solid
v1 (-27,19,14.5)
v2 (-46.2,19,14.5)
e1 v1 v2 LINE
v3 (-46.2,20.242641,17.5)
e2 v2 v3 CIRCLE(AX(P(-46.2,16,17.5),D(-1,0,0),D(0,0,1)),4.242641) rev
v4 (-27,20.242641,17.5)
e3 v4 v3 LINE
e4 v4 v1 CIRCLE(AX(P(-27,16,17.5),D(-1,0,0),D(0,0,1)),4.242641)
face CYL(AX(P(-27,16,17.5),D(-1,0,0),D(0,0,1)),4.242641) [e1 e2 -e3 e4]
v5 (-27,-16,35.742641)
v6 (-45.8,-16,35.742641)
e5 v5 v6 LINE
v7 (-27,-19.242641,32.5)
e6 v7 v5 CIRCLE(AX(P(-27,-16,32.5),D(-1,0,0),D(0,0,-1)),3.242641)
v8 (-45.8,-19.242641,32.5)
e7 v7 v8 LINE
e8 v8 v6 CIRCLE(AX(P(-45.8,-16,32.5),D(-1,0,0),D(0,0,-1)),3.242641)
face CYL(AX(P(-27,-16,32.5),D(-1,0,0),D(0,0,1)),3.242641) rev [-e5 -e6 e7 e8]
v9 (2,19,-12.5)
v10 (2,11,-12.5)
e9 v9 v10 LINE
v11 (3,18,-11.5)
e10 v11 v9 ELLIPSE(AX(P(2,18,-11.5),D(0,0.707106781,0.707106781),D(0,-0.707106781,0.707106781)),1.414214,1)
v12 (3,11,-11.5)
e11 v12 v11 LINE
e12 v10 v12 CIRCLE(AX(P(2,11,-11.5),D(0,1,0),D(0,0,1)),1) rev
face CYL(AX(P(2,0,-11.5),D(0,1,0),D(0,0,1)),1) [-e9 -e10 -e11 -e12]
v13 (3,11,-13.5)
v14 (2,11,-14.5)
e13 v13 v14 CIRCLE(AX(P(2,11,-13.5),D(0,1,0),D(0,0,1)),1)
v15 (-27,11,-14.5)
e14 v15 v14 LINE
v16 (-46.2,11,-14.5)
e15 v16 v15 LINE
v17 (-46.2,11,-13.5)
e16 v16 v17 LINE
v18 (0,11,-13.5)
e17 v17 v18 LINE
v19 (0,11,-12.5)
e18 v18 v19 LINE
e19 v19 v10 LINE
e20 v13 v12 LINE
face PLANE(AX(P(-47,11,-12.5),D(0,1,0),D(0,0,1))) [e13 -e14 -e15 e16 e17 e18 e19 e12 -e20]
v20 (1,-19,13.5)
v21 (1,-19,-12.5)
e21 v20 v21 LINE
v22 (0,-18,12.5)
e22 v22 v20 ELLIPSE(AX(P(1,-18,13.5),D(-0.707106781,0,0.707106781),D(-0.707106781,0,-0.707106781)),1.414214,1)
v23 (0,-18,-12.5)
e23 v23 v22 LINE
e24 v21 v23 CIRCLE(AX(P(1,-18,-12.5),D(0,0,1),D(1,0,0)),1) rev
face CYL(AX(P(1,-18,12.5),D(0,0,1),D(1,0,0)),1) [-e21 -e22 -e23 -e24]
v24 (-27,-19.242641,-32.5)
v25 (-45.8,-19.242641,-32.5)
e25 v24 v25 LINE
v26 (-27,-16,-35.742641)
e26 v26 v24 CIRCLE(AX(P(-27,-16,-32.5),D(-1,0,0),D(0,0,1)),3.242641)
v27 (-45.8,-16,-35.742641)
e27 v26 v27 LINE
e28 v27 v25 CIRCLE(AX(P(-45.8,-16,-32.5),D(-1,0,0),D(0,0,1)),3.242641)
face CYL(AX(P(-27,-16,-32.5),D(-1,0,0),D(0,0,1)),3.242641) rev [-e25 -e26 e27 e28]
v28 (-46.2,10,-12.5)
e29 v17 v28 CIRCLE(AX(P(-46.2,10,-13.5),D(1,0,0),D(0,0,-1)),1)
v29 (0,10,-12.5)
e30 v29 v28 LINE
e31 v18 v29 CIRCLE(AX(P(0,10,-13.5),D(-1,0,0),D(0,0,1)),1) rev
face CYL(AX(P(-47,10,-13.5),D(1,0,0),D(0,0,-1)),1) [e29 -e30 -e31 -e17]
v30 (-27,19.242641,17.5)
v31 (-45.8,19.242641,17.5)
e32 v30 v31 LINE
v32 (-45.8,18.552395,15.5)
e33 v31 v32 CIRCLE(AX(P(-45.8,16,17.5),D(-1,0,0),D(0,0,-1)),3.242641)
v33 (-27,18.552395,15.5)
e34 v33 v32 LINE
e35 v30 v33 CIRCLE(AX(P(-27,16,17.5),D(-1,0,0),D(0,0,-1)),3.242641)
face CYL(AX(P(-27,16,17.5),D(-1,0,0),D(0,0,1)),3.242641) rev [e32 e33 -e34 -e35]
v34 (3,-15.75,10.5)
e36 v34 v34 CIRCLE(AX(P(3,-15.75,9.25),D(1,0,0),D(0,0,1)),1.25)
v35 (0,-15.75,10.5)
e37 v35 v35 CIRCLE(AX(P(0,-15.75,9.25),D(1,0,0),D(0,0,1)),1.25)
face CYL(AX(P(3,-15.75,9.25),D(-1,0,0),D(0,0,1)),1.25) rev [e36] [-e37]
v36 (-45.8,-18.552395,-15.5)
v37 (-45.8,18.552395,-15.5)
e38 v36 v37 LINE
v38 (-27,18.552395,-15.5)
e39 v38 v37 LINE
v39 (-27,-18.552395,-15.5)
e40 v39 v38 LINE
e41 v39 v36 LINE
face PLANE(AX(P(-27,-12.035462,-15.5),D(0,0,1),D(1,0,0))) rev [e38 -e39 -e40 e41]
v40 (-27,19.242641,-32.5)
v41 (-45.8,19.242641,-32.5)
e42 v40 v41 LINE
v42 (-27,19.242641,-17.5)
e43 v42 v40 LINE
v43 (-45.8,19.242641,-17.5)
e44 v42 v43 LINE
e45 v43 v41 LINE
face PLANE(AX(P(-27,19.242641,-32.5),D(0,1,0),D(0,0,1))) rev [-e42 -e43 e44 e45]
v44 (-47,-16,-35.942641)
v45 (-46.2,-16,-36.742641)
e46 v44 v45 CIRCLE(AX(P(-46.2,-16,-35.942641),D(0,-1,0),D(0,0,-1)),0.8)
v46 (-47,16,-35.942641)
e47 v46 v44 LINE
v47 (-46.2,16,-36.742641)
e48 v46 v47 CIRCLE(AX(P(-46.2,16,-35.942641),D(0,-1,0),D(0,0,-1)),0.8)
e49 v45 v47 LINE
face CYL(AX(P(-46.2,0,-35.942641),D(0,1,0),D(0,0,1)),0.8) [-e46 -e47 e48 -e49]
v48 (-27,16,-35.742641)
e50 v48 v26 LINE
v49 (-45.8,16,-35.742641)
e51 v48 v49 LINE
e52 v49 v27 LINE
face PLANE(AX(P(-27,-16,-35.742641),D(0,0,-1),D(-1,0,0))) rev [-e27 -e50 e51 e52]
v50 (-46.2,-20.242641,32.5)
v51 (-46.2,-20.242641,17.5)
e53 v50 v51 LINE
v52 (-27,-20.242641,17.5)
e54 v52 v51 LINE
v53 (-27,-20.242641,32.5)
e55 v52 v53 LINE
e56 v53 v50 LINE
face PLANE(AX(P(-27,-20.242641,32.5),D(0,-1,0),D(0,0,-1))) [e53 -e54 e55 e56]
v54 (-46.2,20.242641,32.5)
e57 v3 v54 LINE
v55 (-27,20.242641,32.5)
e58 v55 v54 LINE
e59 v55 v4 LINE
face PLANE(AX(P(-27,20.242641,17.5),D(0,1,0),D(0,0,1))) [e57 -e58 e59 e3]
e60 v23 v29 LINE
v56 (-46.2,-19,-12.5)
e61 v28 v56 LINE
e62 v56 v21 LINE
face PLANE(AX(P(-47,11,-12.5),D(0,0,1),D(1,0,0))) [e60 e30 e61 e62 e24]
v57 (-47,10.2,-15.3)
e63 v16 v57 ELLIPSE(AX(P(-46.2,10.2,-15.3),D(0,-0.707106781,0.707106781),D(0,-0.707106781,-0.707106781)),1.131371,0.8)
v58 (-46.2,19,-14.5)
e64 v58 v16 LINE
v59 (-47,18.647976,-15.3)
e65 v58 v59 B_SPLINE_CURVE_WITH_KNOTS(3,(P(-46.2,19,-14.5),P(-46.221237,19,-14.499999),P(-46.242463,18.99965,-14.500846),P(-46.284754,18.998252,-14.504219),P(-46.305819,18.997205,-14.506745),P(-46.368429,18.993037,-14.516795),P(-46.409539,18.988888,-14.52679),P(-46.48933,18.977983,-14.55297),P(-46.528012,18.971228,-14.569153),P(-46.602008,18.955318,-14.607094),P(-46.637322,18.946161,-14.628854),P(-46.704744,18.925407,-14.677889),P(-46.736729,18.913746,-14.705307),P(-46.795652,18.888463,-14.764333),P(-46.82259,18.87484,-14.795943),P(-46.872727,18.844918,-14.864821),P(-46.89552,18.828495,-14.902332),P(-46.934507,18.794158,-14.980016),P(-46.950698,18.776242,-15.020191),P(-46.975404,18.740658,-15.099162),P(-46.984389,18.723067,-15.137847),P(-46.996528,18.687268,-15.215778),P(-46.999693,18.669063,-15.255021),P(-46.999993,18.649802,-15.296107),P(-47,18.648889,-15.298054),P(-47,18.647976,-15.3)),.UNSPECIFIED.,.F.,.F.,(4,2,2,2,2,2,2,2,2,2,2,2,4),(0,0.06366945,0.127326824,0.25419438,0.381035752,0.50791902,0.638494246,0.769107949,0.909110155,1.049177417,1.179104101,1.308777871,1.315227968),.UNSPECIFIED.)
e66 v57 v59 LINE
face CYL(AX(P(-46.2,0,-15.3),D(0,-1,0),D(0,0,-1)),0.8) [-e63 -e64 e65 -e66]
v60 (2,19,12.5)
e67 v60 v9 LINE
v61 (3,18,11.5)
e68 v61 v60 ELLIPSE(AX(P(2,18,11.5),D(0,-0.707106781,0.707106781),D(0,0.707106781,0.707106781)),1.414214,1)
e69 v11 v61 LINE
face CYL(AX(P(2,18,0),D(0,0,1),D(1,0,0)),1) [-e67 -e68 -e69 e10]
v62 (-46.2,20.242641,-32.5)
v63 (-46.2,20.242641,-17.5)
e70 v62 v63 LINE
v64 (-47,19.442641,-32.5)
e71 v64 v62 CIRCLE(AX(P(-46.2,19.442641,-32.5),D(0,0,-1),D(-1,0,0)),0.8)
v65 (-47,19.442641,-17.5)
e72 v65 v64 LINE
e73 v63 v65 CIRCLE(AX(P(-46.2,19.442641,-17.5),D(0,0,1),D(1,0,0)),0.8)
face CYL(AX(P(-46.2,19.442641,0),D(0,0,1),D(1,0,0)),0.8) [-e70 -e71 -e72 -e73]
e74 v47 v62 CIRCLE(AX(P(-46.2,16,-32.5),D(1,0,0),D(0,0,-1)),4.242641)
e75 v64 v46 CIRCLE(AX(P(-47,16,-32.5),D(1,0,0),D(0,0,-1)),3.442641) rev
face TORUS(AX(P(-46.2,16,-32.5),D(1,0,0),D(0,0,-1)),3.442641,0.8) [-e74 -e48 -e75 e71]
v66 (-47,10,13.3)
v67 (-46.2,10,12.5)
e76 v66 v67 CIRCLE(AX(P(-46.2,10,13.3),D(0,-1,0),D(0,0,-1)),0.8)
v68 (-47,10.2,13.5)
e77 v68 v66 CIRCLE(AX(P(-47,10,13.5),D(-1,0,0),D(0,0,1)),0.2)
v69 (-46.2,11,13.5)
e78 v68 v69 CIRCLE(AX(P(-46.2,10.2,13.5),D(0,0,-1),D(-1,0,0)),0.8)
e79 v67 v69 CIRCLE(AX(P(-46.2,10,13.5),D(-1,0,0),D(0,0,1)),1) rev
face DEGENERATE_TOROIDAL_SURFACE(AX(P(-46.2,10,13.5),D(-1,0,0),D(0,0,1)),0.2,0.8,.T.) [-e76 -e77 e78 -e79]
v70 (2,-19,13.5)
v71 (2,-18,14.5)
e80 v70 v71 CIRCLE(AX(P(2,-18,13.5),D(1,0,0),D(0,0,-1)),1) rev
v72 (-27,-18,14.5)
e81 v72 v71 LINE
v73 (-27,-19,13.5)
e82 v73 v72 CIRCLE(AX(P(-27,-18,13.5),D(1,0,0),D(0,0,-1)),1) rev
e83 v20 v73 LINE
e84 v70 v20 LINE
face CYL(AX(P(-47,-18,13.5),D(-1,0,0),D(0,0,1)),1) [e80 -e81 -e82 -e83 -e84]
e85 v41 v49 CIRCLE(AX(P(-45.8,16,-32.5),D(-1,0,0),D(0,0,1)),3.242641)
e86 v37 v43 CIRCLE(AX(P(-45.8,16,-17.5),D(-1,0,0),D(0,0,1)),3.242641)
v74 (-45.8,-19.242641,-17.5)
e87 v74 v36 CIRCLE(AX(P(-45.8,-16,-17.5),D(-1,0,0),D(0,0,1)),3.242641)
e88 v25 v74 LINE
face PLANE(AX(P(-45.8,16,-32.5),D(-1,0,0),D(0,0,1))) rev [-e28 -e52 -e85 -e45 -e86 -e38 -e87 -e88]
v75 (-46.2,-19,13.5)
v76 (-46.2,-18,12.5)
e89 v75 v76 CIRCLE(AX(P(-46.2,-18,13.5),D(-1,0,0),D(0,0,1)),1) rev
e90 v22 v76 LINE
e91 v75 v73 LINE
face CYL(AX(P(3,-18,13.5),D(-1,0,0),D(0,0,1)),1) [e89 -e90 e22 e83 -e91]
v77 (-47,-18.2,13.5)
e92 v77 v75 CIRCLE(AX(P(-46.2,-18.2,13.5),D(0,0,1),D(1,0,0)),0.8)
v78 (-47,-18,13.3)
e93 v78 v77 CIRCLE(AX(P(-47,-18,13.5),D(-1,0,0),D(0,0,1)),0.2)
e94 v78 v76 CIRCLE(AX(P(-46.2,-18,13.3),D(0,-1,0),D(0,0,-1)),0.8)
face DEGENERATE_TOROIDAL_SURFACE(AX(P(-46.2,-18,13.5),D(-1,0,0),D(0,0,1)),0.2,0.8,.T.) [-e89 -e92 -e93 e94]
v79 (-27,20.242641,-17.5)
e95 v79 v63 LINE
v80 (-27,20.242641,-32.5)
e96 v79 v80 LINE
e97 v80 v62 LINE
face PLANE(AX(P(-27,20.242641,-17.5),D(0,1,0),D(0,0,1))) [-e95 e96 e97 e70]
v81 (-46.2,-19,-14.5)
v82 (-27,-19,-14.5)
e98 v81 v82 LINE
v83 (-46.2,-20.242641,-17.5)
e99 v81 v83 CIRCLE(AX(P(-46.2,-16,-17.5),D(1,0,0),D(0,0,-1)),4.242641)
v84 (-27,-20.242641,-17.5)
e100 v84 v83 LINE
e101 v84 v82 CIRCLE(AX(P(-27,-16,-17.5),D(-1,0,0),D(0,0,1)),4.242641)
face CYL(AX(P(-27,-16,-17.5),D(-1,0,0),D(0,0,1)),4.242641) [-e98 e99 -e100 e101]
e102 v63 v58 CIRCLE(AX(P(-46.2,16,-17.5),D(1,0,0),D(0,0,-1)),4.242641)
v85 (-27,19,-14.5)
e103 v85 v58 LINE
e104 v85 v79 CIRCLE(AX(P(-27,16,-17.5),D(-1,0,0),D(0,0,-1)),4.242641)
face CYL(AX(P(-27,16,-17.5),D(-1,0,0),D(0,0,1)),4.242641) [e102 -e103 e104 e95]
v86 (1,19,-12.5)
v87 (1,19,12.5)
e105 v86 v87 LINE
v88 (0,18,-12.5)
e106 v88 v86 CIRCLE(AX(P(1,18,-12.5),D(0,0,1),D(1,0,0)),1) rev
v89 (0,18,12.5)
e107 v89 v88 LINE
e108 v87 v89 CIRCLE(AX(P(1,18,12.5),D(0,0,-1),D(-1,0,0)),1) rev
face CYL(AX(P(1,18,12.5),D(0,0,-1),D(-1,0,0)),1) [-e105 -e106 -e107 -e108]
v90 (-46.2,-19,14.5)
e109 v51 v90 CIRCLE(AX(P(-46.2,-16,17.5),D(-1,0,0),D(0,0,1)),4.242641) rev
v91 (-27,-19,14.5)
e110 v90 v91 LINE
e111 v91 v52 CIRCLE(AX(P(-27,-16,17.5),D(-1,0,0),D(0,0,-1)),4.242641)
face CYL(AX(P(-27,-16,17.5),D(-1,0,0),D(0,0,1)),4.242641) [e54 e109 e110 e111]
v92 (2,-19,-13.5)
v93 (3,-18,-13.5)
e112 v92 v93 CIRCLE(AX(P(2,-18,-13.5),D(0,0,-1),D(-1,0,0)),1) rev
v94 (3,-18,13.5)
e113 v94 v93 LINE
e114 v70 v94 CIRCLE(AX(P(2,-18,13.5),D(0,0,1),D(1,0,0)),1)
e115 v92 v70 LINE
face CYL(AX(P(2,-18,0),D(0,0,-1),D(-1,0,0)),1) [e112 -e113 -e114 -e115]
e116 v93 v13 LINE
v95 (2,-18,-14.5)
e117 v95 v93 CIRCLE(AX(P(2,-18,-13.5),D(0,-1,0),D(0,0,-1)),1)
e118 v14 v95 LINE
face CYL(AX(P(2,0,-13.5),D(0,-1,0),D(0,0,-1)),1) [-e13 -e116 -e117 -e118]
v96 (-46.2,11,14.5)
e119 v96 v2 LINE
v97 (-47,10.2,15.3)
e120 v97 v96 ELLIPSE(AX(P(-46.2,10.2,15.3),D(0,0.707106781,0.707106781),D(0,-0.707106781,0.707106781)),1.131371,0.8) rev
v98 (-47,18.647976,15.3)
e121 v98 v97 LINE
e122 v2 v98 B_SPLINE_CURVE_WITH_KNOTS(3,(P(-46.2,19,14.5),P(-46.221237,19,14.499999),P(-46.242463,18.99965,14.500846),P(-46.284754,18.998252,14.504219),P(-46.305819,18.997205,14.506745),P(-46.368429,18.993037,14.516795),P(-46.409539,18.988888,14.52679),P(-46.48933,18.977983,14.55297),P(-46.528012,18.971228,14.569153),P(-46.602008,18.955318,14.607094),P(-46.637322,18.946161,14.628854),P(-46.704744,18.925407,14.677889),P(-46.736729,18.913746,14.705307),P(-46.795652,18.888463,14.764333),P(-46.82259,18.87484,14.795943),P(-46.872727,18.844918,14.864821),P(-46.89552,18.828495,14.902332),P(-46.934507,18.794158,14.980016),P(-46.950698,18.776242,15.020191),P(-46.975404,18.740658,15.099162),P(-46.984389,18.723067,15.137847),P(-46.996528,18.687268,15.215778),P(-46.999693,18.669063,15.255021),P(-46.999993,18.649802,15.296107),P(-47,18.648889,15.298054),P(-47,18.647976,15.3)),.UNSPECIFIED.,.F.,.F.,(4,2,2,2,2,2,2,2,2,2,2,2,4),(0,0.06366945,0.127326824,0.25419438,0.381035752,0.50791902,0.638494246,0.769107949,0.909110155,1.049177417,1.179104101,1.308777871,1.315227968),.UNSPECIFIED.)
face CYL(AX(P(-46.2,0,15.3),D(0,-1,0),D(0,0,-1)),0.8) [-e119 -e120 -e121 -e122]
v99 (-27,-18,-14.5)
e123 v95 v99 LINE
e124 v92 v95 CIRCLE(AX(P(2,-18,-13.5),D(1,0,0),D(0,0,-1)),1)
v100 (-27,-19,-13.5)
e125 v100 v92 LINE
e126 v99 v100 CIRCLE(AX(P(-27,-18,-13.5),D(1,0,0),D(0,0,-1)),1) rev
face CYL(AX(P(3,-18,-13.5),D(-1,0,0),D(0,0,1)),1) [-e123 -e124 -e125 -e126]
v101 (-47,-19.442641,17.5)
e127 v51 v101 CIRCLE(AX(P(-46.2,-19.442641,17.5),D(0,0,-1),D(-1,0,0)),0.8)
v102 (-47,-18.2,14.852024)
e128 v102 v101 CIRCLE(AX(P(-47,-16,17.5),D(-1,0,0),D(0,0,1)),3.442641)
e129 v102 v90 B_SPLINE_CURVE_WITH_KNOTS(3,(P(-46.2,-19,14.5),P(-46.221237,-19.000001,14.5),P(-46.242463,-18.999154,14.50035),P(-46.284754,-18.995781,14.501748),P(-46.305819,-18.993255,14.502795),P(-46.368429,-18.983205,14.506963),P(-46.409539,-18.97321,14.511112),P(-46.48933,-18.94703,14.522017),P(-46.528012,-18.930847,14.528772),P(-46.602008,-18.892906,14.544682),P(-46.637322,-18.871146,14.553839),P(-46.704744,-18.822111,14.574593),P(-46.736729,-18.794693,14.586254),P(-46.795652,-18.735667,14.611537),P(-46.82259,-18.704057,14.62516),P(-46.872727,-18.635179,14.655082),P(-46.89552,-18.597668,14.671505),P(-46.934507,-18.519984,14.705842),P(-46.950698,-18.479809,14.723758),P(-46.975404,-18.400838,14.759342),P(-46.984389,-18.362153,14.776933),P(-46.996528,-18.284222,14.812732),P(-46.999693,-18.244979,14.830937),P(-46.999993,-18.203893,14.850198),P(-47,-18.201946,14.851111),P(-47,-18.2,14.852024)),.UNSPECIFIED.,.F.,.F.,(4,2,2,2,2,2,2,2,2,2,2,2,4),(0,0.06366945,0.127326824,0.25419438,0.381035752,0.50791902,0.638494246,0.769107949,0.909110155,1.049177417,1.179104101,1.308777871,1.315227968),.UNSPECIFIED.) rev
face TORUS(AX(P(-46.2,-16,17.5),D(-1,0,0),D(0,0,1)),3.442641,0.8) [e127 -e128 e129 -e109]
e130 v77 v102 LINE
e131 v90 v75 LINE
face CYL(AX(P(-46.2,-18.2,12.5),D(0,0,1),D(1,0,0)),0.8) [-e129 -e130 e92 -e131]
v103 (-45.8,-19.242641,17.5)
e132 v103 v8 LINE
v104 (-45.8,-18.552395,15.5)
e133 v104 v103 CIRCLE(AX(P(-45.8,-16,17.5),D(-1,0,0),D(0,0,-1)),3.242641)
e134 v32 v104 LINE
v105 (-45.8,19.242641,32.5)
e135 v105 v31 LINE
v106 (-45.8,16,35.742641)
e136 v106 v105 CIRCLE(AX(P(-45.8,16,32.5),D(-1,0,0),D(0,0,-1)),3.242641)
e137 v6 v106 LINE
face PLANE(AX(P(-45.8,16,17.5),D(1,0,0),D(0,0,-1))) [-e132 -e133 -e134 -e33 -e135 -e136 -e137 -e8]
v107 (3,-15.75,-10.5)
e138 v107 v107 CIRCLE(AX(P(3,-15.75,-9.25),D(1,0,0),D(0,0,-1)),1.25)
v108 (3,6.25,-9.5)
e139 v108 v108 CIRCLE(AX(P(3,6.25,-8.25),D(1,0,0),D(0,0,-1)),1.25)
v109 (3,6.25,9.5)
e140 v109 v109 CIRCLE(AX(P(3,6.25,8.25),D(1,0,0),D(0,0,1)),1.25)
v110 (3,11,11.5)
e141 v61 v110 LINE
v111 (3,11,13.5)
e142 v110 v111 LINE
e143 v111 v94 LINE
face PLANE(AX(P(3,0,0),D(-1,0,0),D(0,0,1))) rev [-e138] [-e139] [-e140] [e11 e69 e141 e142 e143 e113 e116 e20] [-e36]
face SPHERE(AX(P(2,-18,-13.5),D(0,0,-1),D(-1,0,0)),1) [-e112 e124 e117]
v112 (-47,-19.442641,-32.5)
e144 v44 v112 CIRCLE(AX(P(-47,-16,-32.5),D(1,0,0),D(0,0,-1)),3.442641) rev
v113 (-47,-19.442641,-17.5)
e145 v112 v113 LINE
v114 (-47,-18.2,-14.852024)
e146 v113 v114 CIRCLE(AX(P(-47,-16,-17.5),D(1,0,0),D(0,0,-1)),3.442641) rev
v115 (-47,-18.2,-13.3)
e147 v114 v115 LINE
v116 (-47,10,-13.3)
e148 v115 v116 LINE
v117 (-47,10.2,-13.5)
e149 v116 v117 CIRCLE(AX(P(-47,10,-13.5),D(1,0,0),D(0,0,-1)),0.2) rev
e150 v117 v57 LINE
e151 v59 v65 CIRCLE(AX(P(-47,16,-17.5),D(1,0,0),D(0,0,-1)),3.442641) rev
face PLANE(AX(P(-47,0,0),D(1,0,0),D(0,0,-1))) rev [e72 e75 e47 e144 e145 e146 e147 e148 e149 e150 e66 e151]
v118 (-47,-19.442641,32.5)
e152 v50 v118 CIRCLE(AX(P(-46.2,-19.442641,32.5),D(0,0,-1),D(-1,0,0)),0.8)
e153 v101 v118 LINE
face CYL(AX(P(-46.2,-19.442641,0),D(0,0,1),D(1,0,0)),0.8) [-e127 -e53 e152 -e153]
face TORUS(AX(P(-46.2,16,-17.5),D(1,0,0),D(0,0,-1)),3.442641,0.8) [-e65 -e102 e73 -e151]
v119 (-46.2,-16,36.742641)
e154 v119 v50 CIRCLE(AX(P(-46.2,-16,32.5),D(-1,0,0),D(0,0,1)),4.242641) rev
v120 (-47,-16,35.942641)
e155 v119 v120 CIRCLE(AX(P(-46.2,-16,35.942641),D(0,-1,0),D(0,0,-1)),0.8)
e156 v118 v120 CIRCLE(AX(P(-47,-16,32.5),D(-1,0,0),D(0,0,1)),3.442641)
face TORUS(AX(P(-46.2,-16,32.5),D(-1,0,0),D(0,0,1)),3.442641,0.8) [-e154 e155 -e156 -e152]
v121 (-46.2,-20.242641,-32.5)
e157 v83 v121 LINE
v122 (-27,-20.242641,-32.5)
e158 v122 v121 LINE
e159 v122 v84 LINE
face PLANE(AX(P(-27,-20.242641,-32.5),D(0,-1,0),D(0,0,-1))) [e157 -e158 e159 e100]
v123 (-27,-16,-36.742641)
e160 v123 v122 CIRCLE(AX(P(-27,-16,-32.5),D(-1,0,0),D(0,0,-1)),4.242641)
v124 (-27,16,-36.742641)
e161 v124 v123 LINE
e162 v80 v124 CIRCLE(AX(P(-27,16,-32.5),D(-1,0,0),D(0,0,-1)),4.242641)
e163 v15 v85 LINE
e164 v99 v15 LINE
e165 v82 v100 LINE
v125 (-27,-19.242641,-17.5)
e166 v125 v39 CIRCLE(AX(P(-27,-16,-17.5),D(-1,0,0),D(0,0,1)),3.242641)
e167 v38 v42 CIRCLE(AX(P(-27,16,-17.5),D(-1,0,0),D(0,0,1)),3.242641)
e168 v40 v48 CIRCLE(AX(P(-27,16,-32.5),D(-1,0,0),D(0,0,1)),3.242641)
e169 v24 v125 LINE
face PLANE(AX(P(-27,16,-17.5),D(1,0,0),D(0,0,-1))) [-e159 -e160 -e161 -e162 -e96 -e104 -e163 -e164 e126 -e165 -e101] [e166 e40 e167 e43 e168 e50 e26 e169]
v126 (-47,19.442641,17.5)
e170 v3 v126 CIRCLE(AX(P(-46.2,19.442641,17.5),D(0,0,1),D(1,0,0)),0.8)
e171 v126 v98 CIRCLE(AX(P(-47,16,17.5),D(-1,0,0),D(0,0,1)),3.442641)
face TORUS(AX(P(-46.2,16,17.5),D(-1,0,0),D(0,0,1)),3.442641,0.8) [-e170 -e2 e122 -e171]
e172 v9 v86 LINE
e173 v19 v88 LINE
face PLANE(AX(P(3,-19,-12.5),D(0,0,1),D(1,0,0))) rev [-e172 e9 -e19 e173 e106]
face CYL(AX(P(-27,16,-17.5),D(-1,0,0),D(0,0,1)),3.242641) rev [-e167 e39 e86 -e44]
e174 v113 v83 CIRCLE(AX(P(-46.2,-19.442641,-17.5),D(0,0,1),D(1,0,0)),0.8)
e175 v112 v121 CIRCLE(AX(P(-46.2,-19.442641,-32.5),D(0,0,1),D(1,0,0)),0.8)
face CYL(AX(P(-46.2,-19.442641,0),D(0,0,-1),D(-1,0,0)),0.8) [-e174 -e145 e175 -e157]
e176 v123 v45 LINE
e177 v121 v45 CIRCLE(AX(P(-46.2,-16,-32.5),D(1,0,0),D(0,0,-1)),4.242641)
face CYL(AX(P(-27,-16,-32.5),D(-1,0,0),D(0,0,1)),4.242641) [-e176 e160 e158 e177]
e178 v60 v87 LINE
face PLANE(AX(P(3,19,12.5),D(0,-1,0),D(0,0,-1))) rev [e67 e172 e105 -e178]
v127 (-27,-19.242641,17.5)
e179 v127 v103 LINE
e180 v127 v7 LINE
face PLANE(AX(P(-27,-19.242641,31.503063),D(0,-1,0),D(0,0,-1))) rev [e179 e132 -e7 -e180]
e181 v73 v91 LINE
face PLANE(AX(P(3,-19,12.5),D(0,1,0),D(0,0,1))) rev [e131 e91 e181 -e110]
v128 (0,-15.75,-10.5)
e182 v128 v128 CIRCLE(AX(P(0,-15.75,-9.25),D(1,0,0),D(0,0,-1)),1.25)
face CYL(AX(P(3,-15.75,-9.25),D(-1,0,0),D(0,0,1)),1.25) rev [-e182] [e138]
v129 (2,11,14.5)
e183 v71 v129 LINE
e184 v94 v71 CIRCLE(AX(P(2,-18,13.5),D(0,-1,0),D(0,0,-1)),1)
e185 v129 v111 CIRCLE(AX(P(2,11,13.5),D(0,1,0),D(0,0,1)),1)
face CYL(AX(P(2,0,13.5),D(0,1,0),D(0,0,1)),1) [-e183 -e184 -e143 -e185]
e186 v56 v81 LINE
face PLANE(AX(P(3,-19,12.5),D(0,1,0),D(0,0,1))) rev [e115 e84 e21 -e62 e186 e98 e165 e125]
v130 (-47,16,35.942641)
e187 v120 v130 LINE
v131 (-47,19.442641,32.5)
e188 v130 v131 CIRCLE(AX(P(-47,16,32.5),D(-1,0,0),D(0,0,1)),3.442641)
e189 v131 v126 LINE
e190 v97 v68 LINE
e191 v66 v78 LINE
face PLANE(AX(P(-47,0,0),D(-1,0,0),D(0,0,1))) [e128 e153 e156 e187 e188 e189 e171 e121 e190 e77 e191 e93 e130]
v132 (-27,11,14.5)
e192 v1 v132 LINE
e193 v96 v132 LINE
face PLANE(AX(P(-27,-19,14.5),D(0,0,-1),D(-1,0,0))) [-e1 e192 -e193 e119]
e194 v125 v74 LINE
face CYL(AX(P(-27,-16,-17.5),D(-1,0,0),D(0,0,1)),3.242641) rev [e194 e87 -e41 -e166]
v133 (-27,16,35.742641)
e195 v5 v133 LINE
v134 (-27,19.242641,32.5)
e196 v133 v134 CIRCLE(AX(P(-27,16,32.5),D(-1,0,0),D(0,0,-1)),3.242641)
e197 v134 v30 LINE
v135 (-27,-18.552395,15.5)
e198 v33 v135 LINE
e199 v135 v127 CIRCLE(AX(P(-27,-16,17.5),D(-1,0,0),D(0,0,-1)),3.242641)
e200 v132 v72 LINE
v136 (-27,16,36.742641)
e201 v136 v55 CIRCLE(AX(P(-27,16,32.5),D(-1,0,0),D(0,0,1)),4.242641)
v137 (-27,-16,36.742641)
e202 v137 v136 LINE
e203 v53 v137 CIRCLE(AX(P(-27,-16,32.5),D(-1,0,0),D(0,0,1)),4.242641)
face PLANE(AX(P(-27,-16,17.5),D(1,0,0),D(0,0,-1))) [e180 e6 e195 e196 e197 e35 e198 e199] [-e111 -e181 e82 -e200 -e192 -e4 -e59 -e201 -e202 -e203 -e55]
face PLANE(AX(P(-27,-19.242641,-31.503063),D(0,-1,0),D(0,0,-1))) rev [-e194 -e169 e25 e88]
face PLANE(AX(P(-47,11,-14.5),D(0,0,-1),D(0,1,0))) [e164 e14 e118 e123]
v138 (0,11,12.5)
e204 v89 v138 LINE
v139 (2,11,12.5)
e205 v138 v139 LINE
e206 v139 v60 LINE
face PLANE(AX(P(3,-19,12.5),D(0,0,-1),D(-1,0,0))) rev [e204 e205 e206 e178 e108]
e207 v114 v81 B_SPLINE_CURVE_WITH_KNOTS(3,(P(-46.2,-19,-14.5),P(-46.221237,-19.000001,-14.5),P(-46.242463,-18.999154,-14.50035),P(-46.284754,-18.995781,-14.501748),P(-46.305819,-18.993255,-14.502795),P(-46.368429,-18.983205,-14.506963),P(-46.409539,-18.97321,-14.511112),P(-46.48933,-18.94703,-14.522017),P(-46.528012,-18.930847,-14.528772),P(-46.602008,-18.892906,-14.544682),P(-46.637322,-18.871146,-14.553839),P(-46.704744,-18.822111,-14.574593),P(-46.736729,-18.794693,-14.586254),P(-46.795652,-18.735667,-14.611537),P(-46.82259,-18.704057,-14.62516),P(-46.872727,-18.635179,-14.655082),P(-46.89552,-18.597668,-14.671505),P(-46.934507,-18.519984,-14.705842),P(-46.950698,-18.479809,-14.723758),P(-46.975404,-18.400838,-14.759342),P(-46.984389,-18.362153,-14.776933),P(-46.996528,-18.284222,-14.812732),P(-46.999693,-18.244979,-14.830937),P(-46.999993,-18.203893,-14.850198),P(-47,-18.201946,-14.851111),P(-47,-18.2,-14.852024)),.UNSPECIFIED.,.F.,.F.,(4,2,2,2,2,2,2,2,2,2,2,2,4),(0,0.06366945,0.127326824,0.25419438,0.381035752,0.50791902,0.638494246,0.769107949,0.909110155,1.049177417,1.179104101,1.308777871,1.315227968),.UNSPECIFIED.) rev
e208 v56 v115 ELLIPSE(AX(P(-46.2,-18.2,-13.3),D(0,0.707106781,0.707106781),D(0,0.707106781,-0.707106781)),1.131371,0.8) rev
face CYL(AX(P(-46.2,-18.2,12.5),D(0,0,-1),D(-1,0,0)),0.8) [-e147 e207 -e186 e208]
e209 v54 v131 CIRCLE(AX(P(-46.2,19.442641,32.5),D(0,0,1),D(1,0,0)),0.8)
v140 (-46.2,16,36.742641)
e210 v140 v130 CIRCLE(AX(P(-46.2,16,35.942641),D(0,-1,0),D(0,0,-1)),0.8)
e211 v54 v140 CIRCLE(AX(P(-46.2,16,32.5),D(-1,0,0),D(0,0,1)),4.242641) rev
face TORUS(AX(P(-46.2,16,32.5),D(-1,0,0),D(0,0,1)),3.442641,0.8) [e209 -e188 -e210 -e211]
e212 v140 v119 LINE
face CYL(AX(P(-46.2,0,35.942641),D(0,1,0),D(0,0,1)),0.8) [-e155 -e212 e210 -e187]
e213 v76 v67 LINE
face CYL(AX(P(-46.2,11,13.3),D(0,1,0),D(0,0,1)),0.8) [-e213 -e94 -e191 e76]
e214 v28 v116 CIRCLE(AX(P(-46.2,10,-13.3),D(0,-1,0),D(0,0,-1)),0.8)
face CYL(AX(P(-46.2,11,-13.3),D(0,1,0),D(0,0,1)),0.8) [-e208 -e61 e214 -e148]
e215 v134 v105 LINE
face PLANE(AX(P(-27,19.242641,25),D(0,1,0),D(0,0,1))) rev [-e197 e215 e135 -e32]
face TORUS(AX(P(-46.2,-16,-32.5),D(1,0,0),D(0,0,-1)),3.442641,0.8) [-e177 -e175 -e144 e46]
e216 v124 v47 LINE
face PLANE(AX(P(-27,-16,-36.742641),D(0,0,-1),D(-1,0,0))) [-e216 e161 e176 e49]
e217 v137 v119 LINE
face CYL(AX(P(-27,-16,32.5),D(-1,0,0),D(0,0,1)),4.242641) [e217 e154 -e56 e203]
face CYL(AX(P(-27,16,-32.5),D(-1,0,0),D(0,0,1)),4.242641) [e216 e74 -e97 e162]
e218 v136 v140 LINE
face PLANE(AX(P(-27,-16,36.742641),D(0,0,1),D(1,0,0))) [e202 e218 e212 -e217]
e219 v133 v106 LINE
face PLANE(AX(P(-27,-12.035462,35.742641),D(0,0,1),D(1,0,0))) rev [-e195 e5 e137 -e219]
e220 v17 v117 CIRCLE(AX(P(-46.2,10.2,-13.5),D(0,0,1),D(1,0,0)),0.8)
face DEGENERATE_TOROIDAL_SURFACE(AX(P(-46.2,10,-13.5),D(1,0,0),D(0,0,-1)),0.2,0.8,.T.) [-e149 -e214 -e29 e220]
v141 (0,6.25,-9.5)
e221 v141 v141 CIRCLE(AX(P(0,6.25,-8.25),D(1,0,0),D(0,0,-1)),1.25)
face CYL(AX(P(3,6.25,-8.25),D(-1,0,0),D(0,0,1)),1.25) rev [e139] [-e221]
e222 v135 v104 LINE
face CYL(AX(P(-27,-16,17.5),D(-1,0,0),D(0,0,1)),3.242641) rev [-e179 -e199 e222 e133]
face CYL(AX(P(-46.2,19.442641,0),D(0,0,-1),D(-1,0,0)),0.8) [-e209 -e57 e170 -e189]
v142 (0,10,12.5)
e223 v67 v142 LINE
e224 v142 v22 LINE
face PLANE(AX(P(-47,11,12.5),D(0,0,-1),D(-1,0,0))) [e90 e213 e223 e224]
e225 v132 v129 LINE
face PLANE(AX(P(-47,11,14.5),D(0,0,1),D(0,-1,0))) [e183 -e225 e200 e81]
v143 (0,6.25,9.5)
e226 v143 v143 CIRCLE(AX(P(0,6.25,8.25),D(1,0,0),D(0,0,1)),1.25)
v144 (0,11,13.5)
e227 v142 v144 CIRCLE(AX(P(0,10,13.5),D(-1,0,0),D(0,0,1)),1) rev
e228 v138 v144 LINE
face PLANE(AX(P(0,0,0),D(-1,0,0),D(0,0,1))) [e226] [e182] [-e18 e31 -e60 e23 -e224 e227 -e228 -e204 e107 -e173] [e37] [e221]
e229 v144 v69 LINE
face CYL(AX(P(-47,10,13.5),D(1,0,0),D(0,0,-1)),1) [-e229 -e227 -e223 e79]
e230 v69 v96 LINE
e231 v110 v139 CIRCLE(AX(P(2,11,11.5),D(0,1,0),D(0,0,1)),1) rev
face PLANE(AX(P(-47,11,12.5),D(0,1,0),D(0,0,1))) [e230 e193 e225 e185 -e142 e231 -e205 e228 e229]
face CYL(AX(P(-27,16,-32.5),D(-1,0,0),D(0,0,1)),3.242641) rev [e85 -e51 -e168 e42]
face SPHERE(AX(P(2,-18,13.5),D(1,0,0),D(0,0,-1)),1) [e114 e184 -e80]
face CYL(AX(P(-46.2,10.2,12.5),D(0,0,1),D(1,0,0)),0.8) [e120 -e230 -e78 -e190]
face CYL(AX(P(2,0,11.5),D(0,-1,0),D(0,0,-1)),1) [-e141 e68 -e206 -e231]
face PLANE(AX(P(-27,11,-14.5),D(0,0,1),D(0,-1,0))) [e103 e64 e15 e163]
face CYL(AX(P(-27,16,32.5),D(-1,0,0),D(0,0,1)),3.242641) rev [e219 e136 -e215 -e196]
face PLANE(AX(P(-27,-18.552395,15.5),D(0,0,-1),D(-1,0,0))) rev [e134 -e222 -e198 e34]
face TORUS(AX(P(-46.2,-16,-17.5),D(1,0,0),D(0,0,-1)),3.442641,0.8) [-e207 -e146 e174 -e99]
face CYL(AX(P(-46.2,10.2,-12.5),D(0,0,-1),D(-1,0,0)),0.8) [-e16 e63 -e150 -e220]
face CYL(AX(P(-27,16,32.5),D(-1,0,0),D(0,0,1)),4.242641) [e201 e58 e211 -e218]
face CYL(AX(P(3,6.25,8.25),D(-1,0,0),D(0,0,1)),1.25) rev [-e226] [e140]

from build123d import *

# Parameters (mm, degrees)
SKETCH_1_W      = 25
SKETCH_1_H      = 38
SKETCH_1_R      = 1.25
EXTRUDE_2_DEPTH = 3
SKETCH_2_W      = 2
SKETCH_2_H      = 30
EXTRUDE_3_DEPTH = 50
EXTRUDE_6_DEPTH = 20
EXTRUDE_7_DEPTH = 1.2
FILLET_4_R      = 1
FILLET_5_R      = 0.8


with BuildPart() as part:
    # 草图1 → 凸台-拉伸2 (new body)
    with BuildSketch(Plane(origin=(0, 0, 0), x_dir=(0, 0, -1), z_dir=(1, 0, 0))):
        Rectangle(SKETCH_1_W, SKETCH_1_H)
        with Locations((9.25, -15.75)):
            Circle(SKETCH_1_R, mode=Mode.SUBTRACT)
        with Locations((8.25, 6.25)):
            Circle(SKETCH_1_R, mode=Mode.SUBTRACT)
        with Locations(Location((-9.25, -15.75, 0), (0, 0, 180))):
            Circle(SKETCH_1_R, mode=Mode.SUBTRACT)
        with Locations(Location((-8.25, 6.25, 0), (0, 0, 180))):
            Circle(SKETCH_1_R, mode=Mode.SUBTRACT)
    extrude(amount=EXTRUDE_2_DEPTH)

    # 草图2 → 凸台-拉伸3 (add)
    with BuildSketch(Plane(origin=(3, 0, 0), x_dir=(0, 0, -1), z_dir=(1, 0, 0))):
        with Locations((13.5, -4)):
            Rectangle(SKETCH_2_W, SKETCH_2_H)
        with Locations((-13.5, -4)):
            Rectangle(SKETCH_2_W, SKETCH_2_H)
    extrude(amount=-EXTRUDE_3_DEPTH)

    # 草图4 → 凸台-拉伸6 (add)
    # profile 1 of 2: a face of its own
    with BuildSketch(Plane.ZY.offset(47)):
        with BuildLine():
            Line((-14.5, 11), (-14.5, 19))
            ThreePointArc((-14.5, 19), (-15.8764117, 19.919688895), (-17.5, 20.242640687))
            Line((-17.5, 20.242640687), (-32.5, 20.242640687))
            ThreePointArc((-32.5, 20.242640687), (-35.5, 19), (-36.742640687, 16))
            Line((-36.742640687, 16), (-36.742640687, -16))
            ThreePointArc((-36.742640687, -16), (-35.5, -19), (-32.5, -20.242640687))
            Line((-32.5, -20.242640687), (-17.5, -20.242640687))
            ThreePointArc((-17.5, -20.242640687), (-15.8764117, -19.919688895), (-14.5, -19))
            Line((-14.5, -19), (-14.5, 11))
        make_face()
        with BuildLine():
            Line((-32.5, 19.242640687), (-25, 19.242640687))
            Line((-25, 19.242640687), (-17.5, 19.242640687))
            ThreePointArc((-17.5, 19.242640687), (-16.442120098, 19.065225724), (-15.5, 18.552394685))
            Line((-15.5, 18.552394685), (-15.5, -12.035462258))
            Line((-15.5, -12.035462258), (-15.5, -18.552394685))
            ThreePointArc((-15.5, -18.552394685), (-16.442120098, -19.065225724), (-17.5, -19.242640687))
            Line((-17.5, -19.242640687), (-31.503062925, -19.242640687))
            Line((-31.503062925, -19.242640687), (-32.5, -19.242640687))
            ThreePointArc((-32.5, -19.242640687), (-34.792893219, -18.292893219), (-35.742640687, -16))
            Line((-35.742640687, -16), (-35.742640687, -12.035462258))
            Line((-35.742640687, -12.035462258), (-35.742640687, 16))
            ThreePointArc((-35.742640687, 16), (-34.792893219, 18.292893219), (-32.5, 19.242640687))
        make_face(mode=Mode.SUBTRACT)
    # profile 2 of 2: a face of its own
    with BuildSketch(Plane.ZY.offset(47)):
        with BuildLine():
            Line((14.5, -19), (14.5, 11))
            Line((14.5, 11), (14.5, 19))
            ThreePointArc((14.5, 19), (15.8764117, 19.919688895), (17.5, 20.242640687))
            Line((17.5, 20.242640687), (32.5, 20.242640687))
            ThreePointArc((32.5, 20.242640687), (35.5, 19), (36.742640687, 16))
            Line((36.742640687, 16), (36.742640687, -16))
            ThreePointArc((36.742640687, -16), (35.5, -19), (32.5, -20.242640687))
            Line((32.5, -20.242640687), (17.5, -20.242640687))
            ThreePointArc((17.5, -20.242640687), (15.8764117, -19.919688895), (14.5, -19))
        make_face()
        with BuildLine():
            Line((35.742640687, -12.035462258), (35.742640687, 16))
            ThreePointArc((35.742640687, 16), (34.792893219, 18.292893219), (32.5, 19.242640687))
            Line((32.5, 19.242640687), (25, 19.242640687))
            Line((25, 19.242640687), (17.5, 19.242640687))
            ThreePointArc((17.5, 19.242640687), (16.442120098, 19.065225724), (15.5, 18.552394685))
            Line((15.5, 18.552394685), (15.5, -12.035462258))
            Line((15.5, -12.035462258), (15.5, -18.552394685))
            ThreePointArc((15.5, -18.552394685), (16.442120098, -19.065225724), (17.5, -19.242640687))
            Line((17.5, -19.242640687), (31.503062925, -19.242640687))
            Line((31.503062925, -19.242640687), (32.5, -19.242640687))
            ThreePointArc((32.5, -19.242640687), (34.792893219, -18.292893219), (35.742640687, -16))
            Line((35.742640687, -16), (35.742640687, -12.035462258))
        make_face(mode=Mode.SUBTRACT)
    extrude(amount=-EXTRUDE_6_DEPTH)

    # 草图5 → 凸台-拉伸7 (add)
    with BuildSketch(Plane.ZY.offset(47)):
        with BuildLine():
            Line((-32.5, 19.242640687), (-17.5, 19.242640687))
            ThreePointArc((-17.5, 19.242640687), (-16.442120098, 19.065225724), (-15.5, 18.552394685))
            Line((-15.5, 18.552394685), (-15.5, -18.552394685))
            ThreePointArc((-15.5, -18.552394685), (-16.442120098, -19.065225724), (-17.5, -19.242640687))
            Line((-17.5, -19.242640687), (-32.5, -19.242640687))
            ThreePointArc((-32.5, -19.242640687), (-34.792893219, -18.292893219), (-35.742640687, -16))
            Line((-35.742640687, -16), (-35.742640687, 16))
            ThreePointArc((-35.742640687, 16), (-34.792893219, 18.292893219), (-32.5, 19.242640687))
        make_face()
        with BuildLine():
            Line((35.742640687, -16), (35.742640687, 16))
            ThreePointArc((35.742640687, 16), (34.792893219, 18.292893219), (32.5, 19.242640687))
            Line((32.5, 19.242640687), (17.5, 19.242640687))
            ThreePointArc((17.5, 19.242640687), (16.442120098, 19.065225724), (15.5, 18.552394685))
            Line((15.5, 18.552394685), (15.5, -18.552394685))
            ThreePointArc((15.5, -18.552394685), (16.442120098, -19.065225724), (17.5, -19.242640687))
            Line((17.5, -19.242640687), (32.5, -19.242640687))
            ThreePointArc((32.5, -19.242640687), (34.792893219, -18.292893219), (35.742640687, -16))
        make_face()
    extrude(amount=-EXTRUDE_7_DEPTH)

    # 圆角4
    fillet_4_edges = [part.edges().sort_by_distance(p)[0] for p in [
        (-23.5, -19, 12.5),
        (-12, -19, 14.5),
        (-12, -19, -14.5),
        (0, -19, 0),
        (0, 19, 0),
        (-23.5, 11, -12.5),
        (-23.5, 11, 12.5),
        (3, -19, 0),
        (3, 15, 12.5),
        (3, -4, 14.5),
        (3, -4, -14.5),
        (3, 15, -12.5),
        (3, 19, 0),
    ]]
    fillet(fillet_4_edges, radius=FILLET_4_R - 0.0001)  # a hair under: the kernel refuses the full size

    # 圆角5
    fillet_5_edges = [part.edges().sort_by_distance(p)[0] for p in [
        (-47, -19.919688895, 15.8764117),
        (-47, -20.242640687, 25),
        (-47, -19, 35.5),
        (-47, 0, 36.742640687),
        (-47, 19, 35.5),
        (-47, 20.242640687, 25),
        (-47, 19.919688895, 15.8764117),
        (-47, 15, 14.5),
        (-47, -4, 12.5),
        (-47, 11, 13.99995),
        (-47, 10.707136071, 12.792863929),
        (-47, -18.707136071, 12.792863929),
        (-47, -4.49995, -12.5),
        (-47, 10.707136071, -12.792863929),
        (-47, 11, -13.99995),
        (-47, -19, -13.5),
        (-47, -19, 13.99995),
        (-47, 19.919688895, -15.8764117),
        (-47, 20.242640687, -25),
        (-47, 19, -35.5),
        (-47, 0, -36.742640687),
        (-47, -19, -35.5),
        (-47, -20.242640687, -25),
        (-47, -19.919688895, -15.8764117),
        (-47, 15, -14.5),
    ]]
    fillet(fillet_5_edges, radius=FILLET_5_R)


solid = part.part
